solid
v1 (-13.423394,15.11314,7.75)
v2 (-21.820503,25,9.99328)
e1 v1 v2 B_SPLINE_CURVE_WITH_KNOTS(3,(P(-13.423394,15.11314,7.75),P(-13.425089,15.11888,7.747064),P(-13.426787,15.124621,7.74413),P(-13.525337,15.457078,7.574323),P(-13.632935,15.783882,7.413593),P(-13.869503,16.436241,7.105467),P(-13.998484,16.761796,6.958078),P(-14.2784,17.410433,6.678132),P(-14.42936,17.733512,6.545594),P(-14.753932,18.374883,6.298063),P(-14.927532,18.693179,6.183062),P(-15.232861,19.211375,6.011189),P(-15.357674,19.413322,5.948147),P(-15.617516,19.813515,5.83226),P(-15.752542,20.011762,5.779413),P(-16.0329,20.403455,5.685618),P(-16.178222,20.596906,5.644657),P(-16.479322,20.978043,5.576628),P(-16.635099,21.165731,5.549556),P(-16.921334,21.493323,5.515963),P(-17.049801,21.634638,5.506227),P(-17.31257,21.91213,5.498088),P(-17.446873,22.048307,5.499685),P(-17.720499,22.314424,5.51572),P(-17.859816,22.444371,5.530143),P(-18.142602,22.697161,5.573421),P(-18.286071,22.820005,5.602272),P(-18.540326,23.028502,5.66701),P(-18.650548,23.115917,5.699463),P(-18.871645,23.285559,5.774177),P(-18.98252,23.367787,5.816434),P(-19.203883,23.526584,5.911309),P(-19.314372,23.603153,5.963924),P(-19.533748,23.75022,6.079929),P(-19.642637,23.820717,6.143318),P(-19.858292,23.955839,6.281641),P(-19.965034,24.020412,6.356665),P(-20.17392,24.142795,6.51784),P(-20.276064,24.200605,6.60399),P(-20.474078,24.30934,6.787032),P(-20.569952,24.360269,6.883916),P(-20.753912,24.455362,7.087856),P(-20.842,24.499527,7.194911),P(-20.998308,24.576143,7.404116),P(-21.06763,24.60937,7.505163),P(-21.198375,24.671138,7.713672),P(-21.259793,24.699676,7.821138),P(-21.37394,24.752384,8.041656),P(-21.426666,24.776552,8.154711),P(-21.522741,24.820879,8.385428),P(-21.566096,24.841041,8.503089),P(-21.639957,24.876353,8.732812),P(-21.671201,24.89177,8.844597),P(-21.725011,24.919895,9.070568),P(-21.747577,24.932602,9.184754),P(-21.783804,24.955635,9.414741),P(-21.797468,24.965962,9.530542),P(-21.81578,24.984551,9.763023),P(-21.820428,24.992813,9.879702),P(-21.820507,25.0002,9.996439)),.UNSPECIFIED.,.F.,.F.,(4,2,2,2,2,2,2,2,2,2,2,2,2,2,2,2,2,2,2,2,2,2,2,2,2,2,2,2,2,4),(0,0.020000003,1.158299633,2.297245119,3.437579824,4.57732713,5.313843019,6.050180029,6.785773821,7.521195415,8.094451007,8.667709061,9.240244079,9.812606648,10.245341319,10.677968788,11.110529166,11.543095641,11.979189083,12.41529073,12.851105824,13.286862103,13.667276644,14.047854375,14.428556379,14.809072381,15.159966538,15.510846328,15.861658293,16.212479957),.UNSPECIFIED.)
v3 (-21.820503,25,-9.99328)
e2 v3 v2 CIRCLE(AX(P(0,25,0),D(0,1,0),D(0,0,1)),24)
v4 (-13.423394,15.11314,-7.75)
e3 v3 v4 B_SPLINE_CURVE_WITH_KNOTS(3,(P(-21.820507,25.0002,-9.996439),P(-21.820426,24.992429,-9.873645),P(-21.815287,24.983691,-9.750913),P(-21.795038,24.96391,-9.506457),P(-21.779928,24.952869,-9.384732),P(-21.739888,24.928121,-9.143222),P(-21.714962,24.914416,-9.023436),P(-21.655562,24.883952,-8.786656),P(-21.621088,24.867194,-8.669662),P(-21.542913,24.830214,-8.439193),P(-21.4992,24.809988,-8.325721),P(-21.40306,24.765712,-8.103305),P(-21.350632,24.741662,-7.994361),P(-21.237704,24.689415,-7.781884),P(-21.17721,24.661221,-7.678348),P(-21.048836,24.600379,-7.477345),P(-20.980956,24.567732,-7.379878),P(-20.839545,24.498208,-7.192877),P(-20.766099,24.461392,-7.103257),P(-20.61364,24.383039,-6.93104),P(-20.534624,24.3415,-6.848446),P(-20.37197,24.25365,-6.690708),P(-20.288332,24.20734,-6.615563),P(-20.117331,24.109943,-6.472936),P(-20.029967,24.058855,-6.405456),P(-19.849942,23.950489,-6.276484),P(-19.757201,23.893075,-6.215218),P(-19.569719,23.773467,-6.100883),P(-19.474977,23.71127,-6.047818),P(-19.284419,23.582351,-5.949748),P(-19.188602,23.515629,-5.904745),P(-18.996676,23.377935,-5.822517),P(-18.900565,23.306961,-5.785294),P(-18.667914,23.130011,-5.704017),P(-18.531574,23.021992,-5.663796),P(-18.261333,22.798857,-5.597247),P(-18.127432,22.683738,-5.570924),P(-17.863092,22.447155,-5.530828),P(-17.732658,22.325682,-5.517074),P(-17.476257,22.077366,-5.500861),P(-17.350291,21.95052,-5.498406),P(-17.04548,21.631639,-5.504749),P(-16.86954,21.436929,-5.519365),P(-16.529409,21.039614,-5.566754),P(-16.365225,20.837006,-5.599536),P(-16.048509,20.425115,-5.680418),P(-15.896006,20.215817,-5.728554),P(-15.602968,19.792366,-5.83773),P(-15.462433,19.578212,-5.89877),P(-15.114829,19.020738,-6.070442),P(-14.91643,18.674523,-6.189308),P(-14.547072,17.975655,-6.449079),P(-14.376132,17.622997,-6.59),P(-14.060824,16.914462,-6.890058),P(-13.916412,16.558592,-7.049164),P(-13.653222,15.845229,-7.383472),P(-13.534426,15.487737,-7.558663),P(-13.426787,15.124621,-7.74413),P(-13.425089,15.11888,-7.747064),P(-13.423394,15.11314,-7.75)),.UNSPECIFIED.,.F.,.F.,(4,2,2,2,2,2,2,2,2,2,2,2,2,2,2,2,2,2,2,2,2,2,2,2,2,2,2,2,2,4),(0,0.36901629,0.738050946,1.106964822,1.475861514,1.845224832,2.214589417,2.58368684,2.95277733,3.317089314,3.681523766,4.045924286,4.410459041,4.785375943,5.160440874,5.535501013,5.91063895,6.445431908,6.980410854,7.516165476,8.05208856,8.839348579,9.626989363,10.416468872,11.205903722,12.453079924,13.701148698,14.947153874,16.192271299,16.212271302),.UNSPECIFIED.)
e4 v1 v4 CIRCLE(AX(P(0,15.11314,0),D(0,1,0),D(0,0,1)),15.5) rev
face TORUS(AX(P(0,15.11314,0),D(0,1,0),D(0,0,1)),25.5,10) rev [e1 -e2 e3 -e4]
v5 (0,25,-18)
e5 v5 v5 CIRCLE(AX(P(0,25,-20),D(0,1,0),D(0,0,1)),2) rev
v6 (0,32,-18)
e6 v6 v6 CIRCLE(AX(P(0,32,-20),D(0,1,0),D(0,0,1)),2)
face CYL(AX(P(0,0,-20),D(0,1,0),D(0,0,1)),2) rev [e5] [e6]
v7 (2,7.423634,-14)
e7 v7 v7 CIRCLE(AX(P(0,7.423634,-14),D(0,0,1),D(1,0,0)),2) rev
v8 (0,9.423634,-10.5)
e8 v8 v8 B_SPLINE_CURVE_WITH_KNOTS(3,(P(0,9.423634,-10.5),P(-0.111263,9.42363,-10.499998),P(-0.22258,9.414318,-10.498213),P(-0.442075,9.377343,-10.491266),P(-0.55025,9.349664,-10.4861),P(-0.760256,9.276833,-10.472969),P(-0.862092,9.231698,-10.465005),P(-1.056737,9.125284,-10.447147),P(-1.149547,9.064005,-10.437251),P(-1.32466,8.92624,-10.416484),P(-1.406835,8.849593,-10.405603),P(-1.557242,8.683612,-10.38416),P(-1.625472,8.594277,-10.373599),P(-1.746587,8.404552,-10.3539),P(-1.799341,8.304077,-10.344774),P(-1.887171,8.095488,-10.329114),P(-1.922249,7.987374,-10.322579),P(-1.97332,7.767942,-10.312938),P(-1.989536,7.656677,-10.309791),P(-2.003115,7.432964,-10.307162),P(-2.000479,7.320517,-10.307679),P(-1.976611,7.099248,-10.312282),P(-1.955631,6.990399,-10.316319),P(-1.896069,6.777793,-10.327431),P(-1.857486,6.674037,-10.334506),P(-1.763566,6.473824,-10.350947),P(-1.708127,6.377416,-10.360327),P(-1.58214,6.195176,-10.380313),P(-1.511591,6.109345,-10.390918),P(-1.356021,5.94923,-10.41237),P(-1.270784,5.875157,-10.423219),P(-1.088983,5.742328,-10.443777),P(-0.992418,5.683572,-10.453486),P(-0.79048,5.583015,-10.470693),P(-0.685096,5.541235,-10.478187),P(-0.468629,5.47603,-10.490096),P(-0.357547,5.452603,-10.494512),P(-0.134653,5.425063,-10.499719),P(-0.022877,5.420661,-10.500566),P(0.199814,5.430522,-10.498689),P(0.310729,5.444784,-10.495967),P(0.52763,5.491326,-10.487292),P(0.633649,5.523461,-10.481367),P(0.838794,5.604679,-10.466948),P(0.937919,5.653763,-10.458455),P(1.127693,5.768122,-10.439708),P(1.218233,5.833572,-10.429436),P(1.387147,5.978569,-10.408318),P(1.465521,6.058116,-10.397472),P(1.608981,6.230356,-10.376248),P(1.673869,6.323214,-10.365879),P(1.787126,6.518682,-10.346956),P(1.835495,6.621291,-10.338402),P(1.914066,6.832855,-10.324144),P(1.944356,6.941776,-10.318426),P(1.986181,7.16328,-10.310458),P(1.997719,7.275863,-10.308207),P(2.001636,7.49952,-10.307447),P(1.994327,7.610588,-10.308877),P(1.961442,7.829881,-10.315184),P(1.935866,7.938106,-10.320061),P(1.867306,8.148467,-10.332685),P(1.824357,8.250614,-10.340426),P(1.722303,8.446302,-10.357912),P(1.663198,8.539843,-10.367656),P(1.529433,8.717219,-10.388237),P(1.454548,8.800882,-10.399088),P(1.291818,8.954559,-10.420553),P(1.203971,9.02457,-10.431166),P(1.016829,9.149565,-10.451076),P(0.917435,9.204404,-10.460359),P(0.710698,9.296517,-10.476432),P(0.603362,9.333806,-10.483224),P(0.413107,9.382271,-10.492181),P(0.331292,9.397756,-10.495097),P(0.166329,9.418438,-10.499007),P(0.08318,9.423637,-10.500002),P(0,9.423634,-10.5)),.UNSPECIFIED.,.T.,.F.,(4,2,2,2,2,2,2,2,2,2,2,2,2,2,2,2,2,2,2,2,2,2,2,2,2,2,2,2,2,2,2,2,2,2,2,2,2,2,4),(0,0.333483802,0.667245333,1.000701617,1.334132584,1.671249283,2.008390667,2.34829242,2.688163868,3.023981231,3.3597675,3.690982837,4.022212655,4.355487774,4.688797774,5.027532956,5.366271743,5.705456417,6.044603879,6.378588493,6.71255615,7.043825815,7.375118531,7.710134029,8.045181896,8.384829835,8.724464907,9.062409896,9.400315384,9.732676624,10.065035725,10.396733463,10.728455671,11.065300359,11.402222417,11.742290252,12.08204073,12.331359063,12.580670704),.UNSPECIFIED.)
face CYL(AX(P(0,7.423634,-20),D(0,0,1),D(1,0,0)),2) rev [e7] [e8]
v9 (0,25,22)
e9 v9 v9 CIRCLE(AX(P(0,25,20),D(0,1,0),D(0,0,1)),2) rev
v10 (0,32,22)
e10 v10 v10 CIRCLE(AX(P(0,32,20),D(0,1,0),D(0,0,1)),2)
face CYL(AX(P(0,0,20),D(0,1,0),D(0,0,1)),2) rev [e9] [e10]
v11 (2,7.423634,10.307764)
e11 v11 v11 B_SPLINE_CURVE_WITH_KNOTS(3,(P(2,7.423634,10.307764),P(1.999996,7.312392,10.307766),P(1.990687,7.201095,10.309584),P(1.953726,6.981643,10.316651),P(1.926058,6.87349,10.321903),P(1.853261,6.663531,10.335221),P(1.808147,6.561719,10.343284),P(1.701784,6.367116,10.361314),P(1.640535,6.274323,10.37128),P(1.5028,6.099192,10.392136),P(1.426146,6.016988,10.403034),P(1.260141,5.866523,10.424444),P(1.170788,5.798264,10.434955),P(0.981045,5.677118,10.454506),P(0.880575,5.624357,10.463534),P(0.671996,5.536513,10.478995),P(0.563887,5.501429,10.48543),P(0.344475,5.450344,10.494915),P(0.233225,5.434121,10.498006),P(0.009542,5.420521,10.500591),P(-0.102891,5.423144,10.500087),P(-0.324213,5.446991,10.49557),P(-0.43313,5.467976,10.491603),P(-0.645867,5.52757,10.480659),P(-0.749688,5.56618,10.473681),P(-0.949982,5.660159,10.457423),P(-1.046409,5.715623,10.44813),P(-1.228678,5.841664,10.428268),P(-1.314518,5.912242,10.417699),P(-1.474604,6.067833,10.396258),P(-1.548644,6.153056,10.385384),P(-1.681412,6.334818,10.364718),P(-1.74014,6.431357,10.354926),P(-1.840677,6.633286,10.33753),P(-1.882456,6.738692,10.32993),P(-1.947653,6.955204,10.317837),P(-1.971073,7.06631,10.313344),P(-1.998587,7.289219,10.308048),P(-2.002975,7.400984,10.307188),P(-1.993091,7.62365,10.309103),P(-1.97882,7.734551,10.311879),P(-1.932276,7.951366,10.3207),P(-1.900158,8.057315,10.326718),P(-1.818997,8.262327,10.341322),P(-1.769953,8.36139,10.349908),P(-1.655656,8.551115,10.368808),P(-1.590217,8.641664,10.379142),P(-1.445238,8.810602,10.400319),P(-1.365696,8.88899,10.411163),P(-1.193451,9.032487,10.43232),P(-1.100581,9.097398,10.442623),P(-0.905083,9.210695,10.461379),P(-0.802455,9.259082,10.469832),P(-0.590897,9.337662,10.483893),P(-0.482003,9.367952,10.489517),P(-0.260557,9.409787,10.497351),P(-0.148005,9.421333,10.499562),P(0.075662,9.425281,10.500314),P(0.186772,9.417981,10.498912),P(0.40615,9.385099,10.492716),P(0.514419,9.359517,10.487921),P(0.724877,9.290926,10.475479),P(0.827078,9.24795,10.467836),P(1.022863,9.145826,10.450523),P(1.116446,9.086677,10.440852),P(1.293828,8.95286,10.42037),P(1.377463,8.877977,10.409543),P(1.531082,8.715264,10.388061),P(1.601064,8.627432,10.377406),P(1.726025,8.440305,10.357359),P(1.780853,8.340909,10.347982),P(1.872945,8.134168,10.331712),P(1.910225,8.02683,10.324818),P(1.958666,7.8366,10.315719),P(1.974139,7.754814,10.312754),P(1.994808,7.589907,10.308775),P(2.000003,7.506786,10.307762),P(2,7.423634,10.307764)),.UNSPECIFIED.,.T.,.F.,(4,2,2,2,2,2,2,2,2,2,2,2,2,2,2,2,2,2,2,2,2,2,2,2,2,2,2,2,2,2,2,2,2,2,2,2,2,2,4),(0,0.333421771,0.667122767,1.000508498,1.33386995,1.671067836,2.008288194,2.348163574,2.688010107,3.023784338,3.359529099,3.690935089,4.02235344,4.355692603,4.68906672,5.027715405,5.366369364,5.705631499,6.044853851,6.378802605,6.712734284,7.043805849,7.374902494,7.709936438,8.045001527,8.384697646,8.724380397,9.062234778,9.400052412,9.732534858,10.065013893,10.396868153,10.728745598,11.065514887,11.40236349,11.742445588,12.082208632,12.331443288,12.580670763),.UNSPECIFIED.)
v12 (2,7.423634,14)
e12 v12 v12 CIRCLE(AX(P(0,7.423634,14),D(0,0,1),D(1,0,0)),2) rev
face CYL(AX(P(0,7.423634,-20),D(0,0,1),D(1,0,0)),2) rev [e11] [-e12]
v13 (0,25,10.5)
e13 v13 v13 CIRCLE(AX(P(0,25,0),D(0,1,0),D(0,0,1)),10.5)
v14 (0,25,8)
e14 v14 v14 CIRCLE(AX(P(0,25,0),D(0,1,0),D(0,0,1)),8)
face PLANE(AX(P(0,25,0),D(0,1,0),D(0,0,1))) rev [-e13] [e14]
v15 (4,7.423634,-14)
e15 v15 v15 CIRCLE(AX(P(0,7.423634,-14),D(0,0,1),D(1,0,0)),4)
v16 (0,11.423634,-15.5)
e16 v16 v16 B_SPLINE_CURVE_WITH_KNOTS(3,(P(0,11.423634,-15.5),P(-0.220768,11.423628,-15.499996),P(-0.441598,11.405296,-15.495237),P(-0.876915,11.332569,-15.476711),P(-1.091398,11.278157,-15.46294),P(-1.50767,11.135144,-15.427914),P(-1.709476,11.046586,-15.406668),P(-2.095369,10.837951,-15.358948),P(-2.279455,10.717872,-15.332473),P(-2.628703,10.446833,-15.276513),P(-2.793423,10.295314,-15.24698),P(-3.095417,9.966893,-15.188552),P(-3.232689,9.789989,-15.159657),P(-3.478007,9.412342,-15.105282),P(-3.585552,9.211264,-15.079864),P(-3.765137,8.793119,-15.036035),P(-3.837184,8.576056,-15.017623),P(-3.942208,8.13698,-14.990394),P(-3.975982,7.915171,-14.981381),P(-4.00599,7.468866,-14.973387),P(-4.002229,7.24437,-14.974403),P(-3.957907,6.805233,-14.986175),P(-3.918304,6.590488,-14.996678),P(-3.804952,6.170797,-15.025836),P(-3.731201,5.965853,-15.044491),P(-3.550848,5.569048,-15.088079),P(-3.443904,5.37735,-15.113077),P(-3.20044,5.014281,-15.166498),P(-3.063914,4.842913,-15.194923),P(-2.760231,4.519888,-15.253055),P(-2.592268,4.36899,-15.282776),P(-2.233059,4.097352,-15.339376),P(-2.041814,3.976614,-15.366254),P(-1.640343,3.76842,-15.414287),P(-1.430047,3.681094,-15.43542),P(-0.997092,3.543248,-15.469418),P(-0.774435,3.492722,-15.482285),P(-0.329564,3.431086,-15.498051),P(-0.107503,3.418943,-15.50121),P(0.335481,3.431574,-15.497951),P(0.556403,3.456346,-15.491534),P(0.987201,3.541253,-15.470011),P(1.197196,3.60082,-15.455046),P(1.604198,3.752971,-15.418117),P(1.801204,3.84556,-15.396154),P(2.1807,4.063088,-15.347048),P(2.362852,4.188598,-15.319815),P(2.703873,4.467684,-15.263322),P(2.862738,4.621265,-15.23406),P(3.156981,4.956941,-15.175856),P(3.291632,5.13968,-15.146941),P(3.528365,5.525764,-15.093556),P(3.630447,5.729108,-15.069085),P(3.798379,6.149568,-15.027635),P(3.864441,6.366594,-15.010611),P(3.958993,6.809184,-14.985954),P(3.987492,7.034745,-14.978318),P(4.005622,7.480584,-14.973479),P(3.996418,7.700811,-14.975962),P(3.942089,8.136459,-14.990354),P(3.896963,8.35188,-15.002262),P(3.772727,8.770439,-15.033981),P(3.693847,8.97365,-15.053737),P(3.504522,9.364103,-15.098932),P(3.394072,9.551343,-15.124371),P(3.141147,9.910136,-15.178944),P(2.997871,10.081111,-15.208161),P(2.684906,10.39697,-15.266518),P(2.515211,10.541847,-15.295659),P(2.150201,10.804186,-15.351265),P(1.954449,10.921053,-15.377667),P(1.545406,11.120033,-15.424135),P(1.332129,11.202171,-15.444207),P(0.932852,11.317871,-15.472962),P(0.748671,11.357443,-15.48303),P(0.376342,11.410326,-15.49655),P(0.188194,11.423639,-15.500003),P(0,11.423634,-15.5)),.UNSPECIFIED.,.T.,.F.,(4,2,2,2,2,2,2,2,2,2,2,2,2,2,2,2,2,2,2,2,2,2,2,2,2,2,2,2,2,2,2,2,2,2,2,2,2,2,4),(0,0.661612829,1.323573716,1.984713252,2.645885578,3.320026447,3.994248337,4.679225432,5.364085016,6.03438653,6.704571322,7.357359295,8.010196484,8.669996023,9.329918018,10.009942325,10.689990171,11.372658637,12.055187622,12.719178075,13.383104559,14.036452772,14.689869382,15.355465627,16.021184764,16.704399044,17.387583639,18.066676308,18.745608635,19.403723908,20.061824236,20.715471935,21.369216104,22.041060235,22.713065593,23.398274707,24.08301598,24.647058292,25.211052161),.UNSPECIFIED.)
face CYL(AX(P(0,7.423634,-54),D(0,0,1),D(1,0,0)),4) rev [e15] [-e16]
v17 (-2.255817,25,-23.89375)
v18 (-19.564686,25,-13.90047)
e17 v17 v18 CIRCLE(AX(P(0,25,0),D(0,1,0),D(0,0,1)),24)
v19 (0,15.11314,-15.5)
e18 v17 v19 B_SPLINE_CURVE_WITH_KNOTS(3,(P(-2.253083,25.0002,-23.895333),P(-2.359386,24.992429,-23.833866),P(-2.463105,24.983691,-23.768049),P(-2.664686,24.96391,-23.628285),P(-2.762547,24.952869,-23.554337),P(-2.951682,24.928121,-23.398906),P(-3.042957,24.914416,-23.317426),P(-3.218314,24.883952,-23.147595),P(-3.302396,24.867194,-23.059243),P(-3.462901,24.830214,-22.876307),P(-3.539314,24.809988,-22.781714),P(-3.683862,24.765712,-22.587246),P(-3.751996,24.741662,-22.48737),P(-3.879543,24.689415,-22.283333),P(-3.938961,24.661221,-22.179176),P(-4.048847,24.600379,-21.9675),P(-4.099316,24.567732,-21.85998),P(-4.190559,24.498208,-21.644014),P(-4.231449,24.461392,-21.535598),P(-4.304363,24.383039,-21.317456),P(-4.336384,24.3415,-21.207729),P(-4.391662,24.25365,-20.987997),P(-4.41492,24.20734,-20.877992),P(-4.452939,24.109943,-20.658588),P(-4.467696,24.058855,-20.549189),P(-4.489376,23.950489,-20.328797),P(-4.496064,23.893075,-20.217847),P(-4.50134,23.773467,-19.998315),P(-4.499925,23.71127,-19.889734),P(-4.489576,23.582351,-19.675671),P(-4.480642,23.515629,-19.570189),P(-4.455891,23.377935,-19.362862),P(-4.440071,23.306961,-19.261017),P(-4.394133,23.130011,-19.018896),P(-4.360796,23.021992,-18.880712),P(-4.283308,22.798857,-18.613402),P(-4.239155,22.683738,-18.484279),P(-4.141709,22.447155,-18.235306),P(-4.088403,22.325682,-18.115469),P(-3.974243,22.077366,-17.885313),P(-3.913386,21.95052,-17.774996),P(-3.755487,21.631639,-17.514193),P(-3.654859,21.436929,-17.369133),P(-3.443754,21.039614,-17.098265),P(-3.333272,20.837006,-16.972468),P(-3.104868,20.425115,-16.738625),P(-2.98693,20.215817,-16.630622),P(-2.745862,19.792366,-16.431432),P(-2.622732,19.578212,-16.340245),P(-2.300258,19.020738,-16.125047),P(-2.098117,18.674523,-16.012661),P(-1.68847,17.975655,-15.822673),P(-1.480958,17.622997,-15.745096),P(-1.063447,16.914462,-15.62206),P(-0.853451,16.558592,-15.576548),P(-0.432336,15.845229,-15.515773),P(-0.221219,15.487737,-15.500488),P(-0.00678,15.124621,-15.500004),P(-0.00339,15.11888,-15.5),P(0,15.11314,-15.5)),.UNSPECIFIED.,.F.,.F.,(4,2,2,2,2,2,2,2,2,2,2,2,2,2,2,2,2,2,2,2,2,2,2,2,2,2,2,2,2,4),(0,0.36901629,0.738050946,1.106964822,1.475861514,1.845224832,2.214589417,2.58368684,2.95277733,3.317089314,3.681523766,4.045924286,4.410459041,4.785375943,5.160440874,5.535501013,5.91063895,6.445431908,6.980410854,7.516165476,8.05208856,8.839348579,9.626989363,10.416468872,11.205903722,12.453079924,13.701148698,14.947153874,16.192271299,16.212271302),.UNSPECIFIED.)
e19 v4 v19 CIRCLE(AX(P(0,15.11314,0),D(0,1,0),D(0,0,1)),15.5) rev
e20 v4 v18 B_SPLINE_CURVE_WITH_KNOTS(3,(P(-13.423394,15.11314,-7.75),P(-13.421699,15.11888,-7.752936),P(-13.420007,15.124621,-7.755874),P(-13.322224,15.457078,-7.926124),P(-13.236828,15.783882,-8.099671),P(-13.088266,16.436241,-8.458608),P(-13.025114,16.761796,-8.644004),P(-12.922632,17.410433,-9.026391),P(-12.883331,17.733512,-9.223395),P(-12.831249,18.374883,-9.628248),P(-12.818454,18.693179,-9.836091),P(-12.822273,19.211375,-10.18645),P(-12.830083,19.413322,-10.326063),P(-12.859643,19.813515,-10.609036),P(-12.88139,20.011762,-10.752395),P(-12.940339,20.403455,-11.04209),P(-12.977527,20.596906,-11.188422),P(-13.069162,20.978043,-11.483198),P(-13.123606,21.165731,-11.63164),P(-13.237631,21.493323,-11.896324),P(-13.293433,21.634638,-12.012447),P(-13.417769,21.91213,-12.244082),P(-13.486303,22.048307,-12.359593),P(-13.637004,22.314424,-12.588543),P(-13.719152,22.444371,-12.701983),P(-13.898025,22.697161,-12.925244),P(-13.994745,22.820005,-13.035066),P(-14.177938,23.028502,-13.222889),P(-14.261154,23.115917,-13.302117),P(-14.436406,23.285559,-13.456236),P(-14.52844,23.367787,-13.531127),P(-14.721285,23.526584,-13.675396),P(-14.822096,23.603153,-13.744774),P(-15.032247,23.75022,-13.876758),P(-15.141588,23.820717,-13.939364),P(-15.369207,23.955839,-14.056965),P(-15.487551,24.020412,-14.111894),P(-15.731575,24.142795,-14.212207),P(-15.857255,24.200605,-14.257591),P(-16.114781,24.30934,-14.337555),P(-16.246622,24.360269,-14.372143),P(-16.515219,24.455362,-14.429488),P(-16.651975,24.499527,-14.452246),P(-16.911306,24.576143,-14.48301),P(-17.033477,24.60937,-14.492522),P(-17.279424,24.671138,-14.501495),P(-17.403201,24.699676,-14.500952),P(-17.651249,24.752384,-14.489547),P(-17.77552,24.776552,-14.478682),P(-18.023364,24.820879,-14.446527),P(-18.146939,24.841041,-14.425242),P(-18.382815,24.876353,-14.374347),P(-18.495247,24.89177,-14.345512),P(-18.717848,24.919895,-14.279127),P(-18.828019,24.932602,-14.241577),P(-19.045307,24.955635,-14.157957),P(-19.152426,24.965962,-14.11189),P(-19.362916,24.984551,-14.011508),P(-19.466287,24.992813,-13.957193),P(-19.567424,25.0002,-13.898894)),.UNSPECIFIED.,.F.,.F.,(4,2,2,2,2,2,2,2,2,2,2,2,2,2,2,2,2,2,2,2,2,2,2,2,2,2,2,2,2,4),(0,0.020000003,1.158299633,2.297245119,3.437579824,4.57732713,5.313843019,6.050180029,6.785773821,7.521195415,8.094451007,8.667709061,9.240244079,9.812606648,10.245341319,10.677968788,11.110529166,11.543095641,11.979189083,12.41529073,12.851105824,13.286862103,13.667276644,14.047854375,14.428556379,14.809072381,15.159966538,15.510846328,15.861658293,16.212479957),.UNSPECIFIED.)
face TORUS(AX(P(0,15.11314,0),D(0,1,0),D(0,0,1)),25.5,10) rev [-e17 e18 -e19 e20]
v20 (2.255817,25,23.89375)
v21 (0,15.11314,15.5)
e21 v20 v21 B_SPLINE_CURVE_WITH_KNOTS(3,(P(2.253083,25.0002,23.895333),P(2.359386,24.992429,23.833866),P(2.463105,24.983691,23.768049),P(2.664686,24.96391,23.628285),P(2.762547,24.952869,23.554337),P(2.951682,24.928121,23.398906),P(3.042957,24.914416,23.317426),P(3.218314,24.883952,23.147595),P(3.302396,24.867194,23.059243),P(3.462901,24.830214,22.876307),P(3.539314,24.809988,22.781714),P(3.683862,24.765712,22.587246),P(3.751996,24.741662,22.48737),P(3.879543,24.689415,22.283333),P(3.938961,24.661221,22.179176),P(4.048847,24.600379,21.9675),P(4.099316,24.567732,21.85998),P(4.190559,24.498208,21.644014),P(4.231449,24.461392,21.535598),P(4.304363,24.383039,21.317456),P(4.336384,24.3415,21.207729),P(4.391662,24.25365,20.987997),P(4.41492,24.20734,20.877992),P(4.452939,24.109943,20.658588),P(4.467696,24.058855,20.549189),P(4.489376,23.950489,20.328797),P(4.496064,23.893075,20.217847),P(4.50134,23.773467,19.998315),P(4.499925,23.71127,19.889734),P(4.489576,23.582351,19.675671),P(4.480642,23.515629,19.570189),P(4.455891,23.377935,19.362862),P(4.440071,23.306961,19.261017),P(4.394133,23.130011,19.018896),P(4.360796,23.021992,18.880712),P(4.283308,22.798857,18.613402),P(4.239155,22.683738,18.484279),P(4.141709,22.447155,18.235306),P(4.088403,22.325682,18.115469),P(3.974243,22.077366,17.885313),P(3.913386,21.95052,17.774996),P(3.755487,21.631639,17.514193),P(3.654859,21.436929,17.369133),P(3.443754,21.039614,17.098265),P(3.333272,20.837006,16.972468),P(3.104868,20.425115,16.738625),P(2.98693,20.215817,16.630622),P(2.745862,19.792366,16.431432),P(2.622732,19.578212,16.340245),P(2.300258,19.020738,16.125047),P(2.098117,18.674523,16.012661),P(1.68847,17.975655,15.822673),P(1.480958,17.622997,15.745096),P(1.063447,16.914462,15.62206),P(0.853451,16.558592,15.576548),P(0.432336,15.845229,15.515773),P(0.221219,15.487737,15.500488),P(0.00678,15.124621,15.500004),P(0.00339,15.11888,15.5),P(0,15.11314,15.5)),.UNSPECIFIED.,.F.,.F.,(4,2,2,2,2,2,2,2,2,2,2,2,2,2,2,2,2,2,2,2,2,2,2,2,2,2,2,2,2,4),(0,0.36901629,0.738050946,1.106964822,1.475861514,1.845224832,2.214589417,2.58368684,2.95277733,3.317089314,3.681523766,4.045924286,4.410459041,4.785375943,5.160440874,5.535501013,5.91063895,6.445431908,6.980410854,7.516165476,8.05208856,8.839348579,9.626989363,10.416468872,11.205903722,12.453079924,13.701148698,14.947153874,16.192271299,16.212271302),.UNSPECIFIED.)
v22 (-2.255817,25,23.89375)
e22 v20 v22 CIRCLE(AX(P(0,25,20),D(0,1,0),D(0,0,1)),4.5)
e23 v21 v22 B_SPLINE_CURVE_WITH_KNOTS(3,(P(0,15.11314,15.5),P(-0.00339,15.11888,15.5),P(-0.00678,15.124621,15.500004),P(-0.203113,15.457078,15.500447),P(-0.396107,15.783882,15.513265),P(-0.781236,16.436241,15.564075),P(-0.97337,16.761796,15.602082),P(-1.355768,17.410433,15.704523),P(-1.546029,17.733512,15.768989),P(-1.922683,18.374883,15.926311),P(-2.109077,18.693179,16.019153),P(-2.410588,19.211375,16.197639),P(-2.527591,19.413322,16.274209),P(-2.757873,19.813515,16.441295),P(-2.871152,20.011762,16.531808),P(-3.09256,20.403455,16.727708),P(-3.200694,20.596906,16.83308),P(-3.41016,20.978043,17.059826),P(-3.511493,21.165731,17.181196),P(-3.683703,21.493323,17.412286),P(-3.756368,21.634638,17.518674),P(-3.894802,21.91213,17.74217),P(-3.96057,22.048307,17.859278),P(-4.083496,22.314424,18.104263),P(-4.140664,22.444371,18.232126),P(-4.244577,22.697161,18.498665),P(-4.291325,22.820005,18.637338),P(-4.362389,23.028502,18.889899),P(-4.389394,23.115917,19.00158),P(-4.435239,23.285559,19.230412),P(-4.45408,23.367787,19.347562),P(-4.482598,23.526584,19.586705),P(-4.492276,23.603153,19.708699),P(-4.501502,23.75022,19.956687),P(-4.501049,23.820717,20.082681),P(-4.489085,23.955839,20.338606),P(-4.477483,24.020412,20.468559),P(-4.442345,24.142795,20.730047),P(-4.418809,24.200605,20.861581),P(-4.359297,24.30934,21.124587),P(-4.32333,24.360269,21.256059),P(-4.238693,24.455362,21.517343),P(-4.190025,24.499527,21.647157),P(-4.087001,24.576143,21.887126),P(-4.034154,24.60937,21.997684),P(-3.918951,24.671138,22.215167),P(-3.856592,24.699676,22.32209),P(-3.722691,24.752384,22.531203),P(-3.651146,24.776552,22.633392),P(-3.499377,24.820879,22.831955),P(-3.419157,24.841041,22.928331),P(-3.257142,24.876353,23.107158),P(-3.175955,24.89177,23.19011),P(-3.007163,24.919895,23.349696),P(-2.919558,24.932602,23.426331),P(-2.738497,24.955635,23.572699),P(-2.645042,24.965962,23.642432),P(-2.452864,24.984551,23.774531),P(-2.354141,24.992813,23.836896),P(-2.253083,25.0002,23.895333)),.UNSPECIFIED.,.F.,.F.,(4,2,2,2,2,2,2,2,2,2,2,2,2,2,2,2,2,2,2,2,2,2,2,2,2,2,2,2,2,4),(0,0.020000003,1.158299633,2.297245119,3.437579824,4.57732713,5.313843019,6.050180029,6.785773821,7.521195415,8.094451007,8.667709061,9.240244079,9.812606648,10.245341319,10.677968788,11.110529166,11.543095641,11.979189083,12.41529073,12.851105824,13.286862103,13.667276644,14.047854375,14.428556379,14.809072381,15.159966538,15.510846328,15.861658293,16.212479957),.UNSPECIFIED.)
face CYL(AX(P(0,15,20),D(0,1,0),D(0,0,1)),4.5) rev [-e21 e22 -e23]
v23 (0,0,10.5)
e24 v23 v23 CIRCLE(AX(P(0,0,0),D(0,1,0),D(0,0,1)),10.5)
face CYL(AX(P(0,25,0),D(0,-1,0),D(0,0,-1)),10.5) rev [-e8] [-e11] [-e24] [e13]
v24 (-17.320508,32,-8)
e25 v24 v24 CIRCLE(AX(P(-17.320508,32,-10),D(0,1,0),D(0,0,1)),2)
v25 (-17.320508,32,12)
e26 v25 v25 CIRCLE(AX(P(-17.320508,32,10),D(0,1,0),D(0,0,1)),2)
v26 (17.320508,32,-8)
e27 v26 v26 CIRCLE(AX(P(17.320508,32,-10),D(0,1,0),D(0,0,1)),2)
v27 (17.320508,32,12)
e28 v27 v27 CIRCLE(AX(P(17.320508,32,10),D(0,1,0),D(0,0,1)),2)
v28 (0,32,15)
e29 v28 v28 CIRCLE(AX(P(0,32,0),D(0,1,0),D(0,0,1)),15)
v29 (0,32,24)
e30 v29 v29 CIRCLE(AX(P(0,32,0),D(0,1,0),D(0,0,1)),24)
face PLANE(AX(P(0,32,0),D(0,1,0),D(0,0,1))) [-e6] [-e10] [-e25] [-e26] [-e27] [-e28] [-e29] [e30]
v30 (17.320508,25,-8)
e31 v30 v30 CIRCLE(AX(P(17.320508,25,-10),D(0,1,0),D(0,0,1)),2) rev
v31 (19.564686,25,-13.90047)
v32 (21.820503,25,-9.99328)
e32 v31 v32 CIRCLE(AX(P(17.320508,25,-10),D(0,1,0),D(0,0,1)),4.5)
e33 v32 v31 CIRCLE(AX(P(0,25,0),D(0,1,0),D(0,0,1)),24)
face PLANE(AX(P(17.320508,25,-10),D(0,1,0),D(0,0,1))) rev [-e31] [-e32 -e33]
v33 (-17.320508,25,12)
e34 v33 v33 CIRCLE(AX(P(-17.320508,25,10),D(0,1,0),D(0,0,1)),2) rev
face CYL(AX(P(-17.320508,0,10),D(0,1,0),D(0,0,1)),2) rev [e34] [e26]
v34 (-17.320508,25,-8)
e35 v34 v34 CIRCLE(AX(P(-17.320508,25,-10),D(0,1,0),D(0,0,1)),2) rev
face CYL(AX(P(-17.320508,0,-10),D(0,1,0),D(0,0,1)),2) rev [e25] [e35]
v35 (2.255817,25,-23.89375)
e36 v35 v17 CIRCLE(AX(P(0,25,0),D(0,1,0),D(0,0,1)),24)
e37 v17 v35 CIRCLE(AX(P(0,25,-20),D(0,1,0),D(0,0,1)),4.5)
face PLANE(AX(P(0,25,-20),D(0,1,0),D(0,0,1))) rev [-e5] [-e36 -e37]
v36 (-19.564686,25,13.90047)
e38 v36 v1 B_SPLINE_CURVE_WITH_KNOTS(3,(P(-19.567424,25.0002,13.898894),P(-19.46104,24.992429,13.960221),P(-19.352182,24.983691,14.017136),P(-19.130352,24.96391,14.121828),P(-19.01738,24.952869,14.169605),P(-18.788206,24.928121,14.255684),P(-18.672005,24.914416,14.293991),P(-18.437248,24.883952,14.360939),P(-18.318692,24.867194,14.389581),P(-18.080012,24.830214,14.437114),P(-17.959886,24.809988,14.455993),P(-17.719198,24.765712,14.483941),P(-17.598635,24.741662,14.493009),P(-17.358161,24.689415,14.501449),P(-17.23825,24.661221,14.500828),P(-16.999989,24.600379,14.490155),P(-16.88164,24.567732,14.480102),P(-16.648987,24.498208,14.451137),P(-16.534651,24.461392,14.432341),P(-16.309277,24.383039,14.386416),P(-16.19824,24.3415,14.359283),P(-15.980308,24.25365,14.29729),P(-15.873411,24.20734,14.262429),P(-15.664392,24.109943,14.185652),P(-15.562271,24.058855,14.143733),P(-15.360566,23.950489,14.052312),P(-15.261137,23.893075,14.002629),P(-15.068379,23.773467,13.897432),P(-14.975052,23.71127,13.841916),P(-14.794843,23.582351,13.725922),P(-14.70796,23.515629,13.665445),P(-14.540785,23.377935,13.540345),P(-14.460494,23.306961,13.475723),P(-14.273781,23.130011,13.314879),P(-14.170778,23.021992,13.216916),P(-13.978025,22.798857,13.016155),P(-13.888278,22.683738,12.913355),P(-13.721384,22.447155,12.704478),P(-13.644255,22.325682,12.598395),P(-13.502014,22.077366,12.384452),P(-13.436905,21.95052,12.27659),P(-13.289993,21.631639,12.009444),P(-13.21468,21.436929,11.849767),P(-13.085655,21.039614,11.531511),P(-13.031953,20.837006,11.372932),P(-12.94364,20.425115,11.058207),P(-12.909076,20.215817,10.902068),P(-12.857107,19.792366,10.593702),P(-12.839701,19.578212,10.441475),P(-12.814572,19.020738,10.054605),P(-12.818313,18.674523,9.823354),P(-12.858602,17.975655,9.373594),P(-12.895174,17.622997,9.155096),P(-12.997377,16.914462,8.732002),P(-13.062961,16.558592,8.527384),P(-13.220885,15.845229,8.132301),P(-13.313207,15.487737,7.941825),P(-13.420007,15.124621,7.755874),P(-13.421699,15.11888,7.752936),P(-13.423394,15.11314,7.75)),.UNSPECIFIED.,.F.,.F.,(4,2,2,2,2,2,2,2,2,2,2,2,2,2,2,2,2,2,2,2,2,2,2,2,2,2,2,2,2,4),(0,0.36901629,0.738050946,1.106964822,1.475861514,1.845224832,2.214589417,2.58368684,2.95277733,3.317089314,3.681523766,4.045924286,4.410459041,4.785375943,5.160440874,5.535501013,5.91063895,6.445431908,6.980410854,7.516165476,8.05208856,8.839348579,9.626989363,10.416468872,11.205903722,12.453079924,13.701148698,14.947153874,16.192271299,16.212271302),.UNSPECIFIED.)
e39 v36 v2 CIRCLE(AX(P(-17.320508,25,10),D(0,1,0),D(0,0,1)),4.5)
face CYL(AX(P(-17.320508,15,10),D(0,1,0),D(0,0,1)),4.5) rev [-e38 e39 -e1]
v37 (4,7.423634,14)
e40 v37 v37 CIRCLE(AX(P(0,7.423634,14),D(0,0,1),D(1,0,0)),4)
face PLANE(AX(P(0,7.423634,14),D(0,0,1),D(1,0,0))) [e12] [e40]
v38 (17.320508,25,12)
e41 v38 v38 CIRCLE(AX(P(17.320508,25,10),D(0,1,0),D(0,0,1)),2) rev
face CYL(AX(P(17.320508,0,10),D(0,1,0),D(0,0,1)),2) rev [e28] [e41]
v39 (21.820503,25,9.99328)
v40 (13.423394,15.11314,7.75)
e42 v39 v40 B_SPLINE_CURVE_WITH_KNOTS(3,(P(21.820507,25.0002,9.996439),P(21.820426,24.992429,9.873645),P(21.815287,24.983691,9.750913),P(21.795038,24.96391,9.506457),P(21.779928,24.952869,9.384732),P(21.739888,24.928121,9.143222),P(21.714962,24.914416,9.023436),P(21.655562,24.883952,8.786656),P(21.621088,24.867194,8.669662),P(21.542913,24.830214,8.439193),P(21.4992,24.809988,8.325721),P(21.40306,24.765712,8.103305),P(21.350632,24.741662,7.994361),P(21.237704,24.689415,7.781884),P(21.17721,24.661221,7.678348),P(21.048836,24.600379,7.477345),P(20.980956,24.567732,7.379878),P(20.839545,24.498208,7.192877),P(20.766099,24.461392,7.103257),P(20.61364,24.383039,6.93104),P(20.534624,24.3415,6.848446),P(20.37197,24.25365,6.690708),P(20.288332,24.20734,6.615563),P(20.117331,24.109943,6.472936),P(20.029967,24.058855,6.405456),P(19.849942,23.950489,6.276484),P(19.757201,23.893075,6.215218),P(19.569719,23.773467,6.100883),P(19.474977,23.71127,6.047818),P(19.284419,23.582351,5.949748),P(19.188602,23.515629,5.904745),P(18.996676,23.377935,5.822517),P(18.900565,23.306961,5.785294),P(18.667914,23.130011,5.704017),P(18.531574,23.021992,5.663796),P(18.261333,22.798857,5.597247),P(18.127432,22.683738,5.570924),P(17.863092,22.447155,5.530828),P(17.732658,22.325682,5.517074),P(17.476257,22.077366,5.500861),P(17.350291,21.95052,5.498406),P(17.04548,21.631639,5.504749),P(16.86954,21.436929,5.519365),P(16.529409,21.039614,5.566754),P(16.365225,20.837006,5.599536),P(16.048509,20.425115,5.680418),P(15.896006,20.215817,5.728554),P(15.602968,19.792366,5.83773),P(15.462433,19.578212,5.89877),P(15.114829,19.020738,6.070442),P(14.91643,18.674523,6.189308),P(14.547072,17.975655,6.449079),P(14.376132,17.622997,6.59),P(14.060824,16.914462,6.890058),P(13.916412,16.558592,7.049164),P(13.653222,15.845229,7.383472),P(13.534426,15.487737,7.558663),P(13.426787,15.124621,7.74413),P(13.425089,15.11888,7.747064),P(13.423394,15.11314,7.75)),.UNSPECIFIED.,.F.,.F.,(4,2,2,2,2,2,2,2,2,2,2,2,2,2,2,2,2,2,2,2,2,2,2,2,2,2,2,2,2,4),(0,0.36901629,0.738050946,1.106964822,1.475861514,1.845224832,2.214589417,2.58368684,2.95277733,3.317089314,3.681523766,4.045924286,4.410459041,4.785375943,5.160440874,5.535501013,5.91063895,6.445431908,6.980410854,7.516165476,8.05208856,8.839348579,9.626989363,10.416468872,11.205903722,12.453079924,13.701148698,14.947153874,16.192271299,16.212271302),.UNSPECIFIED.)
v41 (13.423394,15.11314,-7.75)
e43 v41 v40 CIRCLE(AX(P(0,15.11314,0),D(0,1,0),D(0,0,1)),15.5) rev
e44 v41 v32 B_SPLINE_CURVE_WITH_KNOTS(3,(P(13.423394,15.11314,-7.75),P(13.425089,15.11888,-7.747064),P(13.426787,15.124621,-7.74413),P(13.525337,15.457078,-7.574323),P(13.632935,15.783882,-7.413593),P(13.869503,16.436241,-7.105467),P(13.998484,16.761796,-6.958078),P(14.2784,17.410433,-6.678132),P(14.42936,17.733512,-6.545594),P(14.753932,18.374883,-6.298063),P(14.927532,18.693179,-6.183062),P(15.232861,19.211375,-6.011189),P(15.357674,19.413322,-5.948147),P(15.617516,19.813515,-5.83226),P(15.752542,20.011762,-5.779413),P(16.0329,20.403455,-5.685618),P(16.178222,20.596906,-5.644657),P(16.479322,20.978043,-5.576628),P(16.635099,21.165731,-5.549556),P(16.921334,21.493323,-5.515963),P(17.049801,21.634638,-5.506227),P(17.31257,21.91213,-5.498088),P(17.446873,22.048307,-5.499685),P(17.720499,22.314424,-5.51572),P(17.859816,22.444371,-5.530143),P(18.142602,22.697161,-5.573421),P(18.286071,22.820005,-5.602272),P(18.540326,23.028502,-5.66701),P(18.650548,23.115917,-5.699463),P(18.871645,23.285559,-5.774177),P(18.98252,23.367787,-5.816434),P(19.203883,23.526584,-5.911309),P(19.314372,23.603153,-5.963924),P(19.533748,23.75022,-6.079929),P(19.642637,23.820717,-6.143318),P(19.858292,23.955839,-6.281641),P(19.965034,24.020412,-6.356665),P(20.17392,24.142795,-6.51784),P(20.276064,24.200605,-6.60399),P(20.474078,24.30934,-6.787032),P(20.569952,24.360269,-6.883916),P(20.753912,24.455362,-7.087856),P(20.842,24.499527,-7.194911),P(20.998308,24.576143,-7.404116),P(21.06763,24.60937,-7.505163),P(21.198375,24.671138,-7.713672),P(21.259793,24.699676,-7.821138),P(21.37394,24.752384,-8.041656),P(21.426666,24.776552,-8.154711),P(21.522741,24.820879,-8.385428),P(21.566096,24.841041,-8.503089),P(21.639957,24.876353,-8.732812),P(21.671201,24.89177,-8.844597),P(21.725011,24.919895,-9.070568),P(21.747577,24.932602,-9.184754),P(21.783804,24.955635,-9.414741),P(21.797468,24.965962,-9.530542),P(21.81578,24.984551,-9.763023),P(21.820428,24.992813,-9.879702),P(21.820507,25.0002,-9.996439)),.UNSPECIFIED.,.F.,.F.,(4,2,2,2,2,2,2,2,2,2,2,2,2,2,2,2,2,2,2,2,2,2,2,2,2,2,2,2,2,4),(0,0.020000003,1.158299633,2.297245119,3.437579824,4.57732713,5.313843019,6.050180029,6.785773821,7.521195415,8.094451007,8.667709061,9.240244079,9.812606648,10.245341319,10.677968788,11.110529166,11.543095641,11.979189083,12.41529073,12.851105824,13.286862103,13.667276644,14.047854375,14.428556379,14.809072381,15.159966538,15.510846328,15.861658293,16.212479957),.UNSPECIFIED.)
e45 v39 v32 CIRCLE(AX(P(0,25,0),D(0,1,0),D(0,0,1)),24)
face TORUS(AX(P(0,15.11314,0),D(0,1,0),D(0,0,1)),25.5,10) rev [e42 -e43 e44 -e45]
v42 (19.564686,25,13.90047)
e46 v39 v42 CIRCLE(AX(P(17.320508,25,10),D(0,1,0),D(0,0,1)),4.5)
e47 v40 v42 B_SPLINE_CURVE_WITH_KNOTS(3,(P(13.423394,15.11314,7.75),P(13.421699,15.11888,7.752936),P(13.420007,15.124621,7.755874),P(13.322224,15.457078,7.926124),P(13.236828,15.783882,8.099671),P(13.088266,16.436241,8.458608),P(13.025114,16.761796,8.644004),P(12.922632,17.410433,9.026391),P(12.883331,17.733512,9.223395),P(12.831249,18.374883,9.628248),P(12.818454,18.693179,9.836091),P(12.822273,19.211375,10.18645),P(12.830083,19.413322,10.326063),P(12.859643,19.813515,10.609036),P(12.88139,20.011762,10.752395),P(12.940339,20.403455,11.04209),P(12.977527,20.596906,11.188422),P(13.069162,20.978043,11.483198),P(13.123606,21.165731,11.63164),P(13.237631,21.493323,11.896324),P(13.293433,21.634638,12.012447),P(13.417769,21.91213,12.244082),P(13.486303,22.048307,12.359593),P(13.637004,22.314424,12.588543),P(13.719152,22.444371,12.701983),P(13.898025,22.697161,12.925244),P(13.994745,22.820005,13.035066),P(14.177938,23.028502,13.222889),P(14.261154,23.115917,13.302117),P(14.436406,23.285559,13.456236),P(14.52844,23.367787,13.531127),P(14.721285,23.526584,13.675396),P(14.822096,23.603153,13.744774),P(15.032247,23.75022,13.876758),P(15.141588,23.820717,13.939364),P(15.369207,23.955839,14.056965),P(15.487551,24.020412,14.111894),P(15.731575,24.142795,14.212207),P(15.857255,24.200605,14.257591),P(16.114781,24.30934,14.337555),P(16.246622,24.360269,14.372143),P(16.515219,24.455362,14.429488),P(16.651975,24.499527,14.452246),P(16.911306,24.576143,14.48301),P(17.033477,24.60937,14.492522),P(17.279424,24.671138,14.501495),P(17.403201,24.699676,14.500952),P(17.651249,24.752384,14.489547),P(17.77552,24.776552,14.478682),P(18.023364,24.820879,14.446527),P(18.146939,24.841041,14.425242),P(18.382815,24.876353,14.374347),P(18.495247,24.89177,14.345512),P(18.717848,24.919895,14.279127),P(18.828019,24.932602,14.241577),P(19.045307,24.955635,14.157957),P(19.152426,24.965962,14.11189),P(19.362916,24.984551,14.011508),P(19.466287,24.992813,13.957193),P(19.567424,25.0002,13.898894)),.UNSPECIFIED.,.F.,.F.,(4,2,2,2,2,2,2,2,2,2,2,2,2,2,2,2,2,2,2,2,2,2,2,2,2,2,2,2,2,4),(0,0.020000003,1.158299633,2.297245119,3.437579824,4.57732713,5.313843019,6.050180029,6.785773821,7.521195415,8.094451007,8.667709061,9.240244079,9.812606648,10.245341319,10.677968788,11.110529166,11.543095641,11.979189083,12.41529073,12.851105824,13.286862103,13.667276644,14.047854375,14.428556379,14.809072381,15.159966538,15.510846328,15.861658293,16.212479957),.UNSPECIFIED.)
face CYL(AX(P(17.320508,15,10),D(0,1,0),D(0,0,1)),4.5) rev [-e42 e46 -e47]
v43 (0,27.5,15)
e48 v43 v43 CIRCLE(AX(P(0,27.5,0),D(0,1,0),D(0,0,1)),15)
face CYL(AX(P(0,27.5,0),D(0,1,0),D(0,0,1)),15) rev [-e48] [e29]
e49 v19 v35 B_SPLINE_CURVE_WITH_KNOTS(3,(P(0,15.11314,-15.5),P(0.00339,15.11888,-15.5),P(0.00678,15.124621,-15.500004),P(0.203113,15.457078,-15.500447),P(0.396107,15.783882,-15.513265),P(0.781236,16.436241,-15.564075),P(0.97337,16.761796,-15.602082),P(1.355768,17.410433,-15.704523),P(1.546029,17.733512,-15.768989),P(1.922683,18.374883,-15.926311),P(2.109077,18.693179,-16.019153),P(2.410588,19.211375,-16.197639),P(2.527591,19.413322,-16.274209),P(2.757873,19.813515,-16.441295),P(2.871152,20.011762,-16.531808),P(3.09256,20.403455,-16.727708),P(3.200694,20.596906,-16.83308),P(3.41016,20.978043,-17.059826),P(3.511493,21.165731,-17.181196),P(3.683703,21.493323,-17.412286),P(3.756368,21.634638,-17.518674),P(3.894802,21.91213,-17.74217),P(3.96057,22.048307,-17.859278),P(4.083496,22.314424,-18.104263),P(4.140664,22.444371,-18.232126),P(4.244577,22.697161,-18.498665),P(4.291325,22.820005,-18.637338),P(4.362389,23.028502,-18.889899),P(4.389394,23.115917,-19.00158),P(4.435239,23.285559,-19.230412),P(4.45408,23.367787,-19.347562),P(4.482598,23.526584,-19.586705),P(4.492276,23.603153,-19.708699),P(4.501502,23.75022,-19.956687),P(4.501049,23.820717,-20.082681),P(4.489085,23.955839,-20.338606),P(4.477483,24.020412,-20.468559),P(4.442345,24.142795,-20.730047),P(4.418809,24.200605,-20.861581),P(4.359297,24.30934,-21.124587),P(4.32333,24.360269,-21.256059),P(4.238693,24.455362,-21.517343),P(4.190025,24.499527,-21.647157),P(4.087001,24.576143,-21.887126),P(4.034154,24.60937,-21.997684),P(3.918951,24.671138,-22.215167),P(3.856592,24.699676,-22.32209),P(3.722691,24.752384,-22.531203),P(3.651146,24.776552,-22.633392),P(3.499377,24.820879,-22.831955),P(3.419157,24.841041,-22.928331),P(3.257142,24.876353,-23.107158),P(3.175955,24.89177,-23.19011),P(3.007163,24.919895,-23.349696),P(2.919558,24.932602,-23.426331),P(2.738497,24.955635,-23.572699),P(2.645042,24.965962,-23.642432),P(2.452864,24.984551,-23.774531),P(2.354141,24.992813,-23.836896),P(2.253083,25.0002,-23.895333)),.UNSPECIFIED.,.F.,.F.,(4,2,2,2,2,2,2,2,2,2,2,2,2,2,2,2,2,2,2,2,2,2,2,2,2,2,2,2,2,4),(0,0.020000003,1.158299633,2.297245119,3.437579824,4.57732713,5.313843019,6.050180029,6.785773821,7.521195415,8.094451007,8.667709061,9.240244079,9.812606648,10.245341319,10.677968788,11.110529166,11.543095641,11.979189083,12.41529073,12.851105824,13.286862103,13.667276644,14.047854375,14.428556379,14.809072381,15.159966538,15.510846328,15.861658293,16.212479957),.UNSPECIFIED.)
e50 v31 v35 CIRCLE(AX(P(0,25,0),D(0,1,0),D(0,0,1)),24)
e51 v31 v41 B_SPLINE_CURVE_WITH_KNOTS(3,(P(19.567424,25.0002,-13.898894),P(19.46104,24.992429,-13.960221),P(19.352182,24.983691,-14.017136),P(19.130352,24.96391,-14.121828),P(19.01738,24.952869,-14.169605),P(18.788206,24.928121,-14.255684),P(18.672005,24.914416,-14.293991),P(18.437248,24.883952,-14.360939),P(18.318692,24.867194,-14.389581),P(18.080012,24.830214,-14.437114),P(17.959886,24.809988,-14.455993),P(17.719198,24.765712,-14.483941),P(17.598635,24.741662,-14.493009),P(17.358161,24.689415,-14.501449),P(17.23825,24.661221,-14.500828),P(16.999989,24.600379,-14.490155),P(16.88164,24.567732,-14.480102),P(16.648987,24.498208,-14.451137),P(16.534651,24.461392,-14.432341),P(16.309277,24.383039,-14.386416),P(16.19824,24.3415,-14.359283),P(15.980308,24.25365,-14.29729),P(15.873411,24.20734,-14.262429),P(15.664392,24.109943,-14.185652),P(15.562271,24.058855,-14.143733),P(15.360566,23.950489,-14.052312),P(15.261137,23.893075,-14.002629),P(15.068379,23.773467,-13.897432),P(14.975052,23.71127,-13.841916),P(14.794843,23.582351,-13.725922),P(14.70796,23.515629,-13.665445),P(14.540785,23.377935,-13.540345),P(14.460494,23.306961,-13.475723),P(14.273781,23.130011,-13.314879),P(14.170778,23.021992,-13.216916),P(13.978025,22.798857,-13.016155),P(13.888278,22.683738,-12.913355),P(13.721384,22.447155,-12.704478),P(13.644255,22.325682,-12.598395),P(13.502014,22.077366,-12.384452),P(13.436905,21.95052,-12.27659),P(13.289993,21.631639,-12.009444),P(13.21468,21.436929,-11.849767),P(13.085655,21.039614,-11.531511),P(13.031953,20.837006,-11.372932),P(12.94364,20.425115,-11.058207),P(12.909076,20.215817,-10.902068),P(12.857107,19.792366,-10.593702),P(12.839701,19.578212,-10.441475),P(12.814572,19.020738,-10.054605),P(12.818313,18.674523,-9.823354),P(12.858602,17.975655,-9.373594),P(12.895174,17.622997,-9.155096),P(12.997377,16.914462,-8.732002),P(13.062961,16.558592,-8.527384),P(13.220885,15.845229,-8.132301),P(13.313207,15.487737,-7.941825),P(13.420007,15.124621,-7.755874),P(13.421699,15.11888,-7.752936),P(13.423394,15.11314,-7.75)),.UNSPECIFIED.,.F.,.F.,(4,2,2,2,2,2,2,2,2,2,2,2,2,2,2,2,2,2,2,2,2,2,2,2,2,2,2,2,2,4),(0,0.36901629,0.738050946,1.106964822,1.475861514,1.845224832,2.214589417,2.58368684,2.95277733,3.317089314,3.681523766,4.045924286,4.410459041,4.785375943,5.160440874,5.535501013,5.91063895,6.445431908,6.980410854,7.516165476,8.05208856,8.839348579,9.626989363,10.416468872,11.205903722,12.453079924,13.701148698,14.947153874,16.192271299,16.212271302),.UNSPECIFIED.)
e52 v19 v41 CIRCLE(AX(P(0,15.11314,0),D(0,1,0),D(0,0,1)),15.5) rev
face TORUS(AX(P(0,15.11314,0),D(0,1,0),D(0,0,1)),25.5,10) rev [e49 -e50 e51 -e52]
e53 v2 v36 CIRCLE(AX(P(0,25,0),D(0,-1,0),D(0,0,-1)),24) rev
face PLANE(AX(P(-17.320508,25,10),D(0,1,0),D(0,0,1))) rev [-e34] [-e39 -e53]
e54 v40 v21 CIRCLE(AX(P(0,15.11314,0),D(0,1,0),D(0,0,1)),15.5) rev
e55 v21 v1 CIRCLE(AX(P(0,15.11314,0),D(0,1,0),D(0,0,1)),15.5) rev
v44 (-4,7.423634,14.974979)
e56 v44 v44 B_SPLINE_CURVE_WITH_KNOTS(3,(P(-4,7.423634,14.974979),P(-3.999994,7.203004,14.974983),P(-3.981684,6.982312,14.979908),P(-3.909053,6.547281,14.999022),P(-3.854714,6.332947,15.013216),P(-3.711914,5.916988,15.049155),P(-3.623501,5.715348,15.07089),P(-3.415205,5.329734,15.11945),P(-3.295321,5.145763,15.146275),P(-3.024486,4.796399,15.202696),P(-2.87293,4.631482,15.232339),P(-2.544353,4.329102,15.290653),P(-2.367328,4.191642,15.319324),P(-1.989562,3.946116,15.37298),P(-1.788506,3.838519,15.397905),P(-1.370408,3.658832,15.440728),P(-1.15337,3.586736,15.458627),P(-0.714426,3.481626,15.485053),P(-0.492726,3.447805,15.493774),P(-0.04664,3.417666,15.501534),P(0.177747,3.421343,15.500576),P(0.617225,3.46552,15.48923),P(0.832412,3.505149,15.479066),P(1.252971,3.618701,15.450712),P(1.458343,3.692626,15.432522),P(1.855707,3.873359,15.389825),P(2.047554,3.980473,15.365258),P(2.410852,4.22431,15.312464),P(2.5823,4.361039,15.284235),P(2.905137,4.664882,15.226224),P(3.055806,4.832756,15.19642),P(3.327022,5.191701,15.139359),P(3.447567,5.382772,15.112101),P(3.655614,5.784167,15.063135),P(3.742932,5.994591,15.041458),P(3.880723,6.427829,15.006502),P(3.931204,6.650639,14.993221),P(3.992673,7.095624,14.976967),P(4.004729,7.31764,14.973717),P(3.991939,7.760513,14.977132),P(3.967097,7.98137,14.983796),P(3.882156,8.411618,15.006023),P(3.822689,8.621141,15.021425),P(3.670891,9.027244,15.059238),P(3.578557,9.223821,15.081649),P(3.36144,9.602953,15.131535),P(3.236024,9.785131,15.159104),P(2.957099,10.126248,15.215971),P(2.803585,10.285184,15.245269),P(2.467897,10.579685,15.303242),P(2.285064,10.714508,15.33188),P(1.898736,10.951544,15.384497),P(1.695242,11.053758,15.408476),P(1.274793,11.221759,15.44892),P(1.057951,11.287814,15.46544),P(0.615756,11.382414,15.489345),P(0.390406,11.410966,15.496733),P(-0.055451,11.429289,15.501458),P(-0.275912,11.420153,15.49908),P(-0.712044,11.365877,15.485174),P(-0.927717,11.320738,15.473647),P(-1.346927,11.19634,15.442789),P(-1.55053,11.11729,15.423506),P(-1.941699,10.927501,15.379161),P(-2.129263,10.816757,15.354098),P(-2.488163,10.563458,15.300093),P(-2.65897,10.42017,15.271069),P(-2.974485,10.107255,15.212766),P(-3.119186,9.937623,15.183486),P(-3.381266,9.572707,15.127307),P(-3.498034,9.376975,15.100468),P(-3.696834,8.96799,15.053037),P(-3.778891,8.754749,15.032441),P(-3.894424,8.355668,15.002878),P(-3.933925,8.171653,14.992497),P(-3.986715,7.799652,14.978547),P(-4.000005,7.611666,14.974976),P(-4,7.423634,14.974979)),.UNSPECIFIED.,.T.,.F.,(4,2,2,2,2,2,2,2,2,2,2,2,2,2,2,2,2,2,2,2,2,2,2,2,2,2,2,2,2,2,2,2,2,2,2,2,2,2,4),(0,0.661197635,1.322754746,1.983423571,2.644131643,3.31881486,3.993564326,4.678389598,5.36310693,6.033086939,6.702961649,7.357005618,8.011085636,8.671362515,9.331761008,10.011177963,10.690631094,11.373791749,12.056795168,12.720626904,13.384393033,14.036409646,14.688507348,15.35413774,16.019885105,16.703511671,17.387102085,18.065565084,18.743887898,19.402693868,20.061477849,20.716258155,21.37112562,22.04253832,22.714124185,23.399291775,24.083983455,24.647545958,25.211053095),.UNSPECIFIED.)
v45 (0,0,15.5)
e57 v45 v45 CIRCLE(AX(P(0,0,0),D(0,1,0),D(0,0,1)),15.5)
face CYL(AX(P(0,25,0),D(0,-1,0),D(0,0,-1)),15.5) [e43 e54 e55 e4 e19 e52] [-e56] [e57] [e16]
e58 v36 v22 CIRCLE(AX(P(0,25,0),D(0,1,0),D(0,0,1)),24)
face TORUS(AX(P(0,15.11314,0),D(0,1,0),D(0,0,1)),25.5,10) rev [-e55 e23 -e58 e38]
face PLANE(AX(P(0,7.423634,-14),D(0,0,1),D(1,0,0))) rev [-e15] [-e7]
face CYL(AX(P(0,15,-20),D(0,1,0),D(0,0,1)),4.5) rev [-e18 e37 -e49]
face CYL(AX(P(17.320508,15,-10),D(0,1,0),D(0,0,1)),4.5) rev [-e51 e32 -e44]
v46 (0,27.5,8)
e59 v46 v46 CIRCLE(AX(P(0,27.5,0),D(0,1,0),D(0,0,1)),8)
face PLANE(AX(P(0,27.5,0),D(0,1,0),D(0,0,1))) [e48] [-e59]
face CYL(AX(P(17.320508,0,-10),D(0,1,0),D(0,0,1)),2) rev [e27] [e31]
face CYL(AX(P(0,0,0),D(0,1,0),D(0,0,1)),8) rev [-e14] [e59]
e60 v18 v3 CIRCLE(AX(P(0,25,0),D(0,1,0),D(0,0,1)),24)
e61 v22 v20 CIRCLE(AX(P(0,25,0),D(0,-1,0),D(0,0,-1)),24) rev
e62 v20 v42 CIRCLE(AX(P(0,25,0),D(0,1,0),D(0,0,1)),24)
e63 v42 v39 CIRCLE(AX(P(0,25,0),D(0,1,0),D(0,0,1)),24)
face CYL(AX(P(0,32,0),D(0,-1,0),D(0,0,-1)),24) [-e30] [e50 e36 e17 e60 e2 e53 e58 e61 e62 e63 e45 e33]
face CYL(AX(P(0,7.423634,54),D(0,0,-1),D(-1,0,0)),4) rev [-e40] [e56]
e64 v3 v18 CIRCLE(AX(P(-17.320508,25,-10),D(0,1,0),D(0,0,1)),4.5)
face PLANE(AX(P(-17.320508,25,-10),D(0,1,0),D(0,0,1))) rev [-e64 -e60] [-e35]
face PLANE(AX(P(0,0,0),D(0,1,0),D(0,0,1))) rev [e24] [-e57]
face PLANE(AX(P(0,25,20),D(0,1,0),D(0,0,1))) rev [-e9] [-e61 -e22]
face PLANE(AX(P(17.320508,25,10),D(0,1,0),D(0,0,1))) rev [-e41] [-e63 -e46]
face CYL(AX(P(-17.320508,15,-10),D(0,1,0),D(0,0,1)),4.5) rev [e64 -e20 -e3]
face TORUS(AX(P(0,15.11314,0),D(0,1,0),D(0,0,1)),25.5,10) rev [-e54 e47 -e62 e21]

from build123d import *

# Parameters (mm, degrees)
SKETCH_1_R          = 15.5
SKETCH_1_R_2        = 10.5
EXTRUDE_1_DEPTH     = 25
SKETCH_3_R          = 24
EXTRUDE_2_DEPTH     = 7
FILLET_1_R          = 10
SKETCH_5_R          = 15
CUT_EXTRUDE_3_DEPTH = 4.5
SKETCH_6_R          = 8
CUT_EXTRUDE_4_DEPTH = 44.683520920365446
SKETCH_7_R          = 2.0000000000000018
SKETCH_7_R_2        = 2.0000000000000036
SKETCH_7_R_3        = 2.0000000000000004
SKETCH_7_R_4        = 2.0000000000000013
SKETCH_7_R_5        = 2.000000000000003
SKETCH_7_R_6        = 2
CUT_EXTRUDE_5_DEPTH = 47.64761515876246
CUT_EXTRUDE_START   = -7
SKETCH_8_R          = 4.500000000000001
SKETCH_8_R_2        = 4.500000000000002
SKETCH_8_R_3        = 4.5000000000000036
SKETCH_8_R_4        = 4.499999999999999
CUT_EXTRUDE_6_DEPTH = 10
SKETCH_9_R          = 2
CUT_EXTRUDE_7_DEPTH = 20
CUT_EXTRUDE_START_2 = -14
SKETCH_11_R         = 4
CUT_EXTRUDE_8_DEPTH = 40
CUT_EXTRUDE_START_3 = 54
SKETCH_12_R         = 4
CUT_EXTRUDE_9_DEPTH = 40


with BuildPart() as part:
    # Эскиз1 → Вытянуть1 (new body)
    with BuildSketch(Plane(origin=(0, 0, 0), x_dir=(1, 0, 0), z_dir=(0, 1, 0))):
        with Locations(Location((0, 0, 0), (0, 0, 270))):
            Circle(SKETCH_1_R)
        with Locations(Location((0, 0, 0), (0, 0, 270))):
            Circle(SKETCH_1_R_2, mode=Mode.SUBTRACT)
    extrude(amount=EXTRUDE_1_DEPTH)

    # Эскиз3 → Вытянуть2 (add)
    with BuildSketch(Plane(origin=(0, 25, 0), x_dir=(1, 0, 0), z_dir=(0, 1, 0))):
        with Locations(Location((0, 0, 0), (0, 0, 270))):
            Circle(SKETCH_3_R)
    extrude(amount=EXTRUDE_2_DEPTH)

    # Скругление1
    # the kernel refuses this fillet: 10 mm, written as the material it adds along each edge
    with BuildSketch(Plane(origin=(0, 25, 0), x_dir=(-1.8e-16, 0, 1), z_dir=(-1, 0, -1.8e-16))) as fillet_1_piece_1:
        with BuildLine():
            CenterArc((25.5, -9.886859966642819), FILLET_1_R, 98.62692655867845, 81.37307344132155)
            Line((15.5, -9.886859966642819), (15.3, -9.886859966642819))
            Line((15.3, -9.886859966642819), (15.3, 0))
            Line((15.3, 0), (15.5, 0.1999999999999993))
            ThreePointArc((15.5, 0.1999999999999993), (19.750000000000014, 0.1999999999999993), (23.970000000000034, 0.19773719933263223))
            Line((23.970000000000034, 0.19773719933263223), (24.000000000000032, -2.2027e-13))
        make_face()
    revolve(axis=Axis((0, 25, 0), (0, 1, 0)))

    # Эскиз5 → Вытянуть3 (cut)
    with BuildSketch(Plane(origin=(0, 32, 0), x_dir=(1, 0, 0), z_dir=(0, 1, 0))):
        with Locations(Location((0, 0, 0), (0, 0, 270))):
            Circle(SKETCH_5_R)
    extrude(amount=-CUT_EXTRUDE_3_DEPTH, mode=Mode.SUBTRACT)

    # Эскиз6 → Вытянуть4 (cut, through all)
    with BuildSketch(Plane(origin=(0, 27.5, 0), x_dir=(1, 0, 0), z_dir=(0, 1, 0))):
        with Locations(Location((0, 0, 0), (0, 0, 270))):
            Circle(SKETCH_6_R)
    extrude(amount=-CUT_EXTRUDE_4_DEPTH, mode=Mode.SUBTRACT)

    # Эскиз7 → Вытянуть5 (cut, through all)
    with BuildSketch(Plane(origin=(0, 32, 0), x_dir=(1, 0, 0), z_dir=(0, 1, 0))):
        with Locations(Location((0, -20, 0), (0, 0, 270))):
            Circle(SKETCH_7_R)
        with Locations(Location((-17.320508075688796, -9.999999999999961, 0), (0, 0, 270))):
            Circle(SKETCH_7_R_2)
        with Locations(Location((-17.320508075688732, 10.00000000000008, 0), (0, 0, 270))):
            Circle(SKETCH_7_R_3)
        with Locations(Location((1.3966e-13, 20, 0), (0, 0, 270))):
            Circle(SKETCH_7_R_4)
        with Locations(Location((17.32050807568886, 9.999999999999838, 0), (0, 0, 270))):
            Circle(SKETCH_7_R_5)
        with Locations(Location((17.320508075688657, -10.000000000000204, 0), (0, 0, 270))):
            Circle(SKETCH_7_R_6)
    extrude(amount=-CUT_EXTRUDE_5_DEPTH, mode=Mode.SUBTRACT)

    # Эскиз8 → Вытянуть6 (cut)
    with BuildSketch(Plane(origin=(0, 32, 0), x_dir=(1, 0, 0), z_dir=(0, 1, 0)).offset(CUT_EXTRUDE_START)):
        with Locations((0, -20)):
            Circle(SKETCH_8_R)
        with Locations((-17.320508075688796, -9.999999999999961)):
            Circle(SKETCH_8_R_2)
        with Locations((-17.320508075688732, 10.00000000000008)):
            Circle(SKETCH_8_R)
        with Locations((1.3966e-13, 20)):
            Circle(SKETCH_8_R)
        with Locations((17.32050807568886, 9.999999999999838)):
            Circle(SKETCH_8_R_3)
        with Locations((17.320508075688657, -10.000000000000204)):
            Circle(SKETCH_8_R_4)
    extrude(amount=-CUT_EXTRUDE_6_DEPTH, mode=Mode.SUBTRACT)

    # Эскиз9 → Вытянуть7 (cut, symmetric)
    with BuildSketch(Plane.XY):
        with Locations((0, 7.423633946327345)):
            Circle(SKETCH_9_R)
    extrude(amount=CUT_EXTRUDE_7_DEPTH, both=True, mode=Mode.SUBTRACT)

    # Эскиз11 → Вытянуть8 (cut)
    with BuildSketch(Plane.XY.offset(CUT_EXTRUDE_START_2)):
        with Locations((0, 7.423633946327345)):
            Circle(SKETCH_11_R)
    extrude(amount=-CUT_EXTRUDE_8_DEPTH, mode=Mode.SUBTRACT)

    # Эскиз12 → Вытянуть9 (cut)
    with BuildSketch(Plane.XY.offset(CUT_EXTRUDE_START_3)):
        with Locations((0, 7.423633946327345)):
            Circle(SKETCH_12_R)
    extrude(amount=-CUT_EXTRUDE_9_DEPTH, mode=Mode.SUBTRACT)


solid = part.part
